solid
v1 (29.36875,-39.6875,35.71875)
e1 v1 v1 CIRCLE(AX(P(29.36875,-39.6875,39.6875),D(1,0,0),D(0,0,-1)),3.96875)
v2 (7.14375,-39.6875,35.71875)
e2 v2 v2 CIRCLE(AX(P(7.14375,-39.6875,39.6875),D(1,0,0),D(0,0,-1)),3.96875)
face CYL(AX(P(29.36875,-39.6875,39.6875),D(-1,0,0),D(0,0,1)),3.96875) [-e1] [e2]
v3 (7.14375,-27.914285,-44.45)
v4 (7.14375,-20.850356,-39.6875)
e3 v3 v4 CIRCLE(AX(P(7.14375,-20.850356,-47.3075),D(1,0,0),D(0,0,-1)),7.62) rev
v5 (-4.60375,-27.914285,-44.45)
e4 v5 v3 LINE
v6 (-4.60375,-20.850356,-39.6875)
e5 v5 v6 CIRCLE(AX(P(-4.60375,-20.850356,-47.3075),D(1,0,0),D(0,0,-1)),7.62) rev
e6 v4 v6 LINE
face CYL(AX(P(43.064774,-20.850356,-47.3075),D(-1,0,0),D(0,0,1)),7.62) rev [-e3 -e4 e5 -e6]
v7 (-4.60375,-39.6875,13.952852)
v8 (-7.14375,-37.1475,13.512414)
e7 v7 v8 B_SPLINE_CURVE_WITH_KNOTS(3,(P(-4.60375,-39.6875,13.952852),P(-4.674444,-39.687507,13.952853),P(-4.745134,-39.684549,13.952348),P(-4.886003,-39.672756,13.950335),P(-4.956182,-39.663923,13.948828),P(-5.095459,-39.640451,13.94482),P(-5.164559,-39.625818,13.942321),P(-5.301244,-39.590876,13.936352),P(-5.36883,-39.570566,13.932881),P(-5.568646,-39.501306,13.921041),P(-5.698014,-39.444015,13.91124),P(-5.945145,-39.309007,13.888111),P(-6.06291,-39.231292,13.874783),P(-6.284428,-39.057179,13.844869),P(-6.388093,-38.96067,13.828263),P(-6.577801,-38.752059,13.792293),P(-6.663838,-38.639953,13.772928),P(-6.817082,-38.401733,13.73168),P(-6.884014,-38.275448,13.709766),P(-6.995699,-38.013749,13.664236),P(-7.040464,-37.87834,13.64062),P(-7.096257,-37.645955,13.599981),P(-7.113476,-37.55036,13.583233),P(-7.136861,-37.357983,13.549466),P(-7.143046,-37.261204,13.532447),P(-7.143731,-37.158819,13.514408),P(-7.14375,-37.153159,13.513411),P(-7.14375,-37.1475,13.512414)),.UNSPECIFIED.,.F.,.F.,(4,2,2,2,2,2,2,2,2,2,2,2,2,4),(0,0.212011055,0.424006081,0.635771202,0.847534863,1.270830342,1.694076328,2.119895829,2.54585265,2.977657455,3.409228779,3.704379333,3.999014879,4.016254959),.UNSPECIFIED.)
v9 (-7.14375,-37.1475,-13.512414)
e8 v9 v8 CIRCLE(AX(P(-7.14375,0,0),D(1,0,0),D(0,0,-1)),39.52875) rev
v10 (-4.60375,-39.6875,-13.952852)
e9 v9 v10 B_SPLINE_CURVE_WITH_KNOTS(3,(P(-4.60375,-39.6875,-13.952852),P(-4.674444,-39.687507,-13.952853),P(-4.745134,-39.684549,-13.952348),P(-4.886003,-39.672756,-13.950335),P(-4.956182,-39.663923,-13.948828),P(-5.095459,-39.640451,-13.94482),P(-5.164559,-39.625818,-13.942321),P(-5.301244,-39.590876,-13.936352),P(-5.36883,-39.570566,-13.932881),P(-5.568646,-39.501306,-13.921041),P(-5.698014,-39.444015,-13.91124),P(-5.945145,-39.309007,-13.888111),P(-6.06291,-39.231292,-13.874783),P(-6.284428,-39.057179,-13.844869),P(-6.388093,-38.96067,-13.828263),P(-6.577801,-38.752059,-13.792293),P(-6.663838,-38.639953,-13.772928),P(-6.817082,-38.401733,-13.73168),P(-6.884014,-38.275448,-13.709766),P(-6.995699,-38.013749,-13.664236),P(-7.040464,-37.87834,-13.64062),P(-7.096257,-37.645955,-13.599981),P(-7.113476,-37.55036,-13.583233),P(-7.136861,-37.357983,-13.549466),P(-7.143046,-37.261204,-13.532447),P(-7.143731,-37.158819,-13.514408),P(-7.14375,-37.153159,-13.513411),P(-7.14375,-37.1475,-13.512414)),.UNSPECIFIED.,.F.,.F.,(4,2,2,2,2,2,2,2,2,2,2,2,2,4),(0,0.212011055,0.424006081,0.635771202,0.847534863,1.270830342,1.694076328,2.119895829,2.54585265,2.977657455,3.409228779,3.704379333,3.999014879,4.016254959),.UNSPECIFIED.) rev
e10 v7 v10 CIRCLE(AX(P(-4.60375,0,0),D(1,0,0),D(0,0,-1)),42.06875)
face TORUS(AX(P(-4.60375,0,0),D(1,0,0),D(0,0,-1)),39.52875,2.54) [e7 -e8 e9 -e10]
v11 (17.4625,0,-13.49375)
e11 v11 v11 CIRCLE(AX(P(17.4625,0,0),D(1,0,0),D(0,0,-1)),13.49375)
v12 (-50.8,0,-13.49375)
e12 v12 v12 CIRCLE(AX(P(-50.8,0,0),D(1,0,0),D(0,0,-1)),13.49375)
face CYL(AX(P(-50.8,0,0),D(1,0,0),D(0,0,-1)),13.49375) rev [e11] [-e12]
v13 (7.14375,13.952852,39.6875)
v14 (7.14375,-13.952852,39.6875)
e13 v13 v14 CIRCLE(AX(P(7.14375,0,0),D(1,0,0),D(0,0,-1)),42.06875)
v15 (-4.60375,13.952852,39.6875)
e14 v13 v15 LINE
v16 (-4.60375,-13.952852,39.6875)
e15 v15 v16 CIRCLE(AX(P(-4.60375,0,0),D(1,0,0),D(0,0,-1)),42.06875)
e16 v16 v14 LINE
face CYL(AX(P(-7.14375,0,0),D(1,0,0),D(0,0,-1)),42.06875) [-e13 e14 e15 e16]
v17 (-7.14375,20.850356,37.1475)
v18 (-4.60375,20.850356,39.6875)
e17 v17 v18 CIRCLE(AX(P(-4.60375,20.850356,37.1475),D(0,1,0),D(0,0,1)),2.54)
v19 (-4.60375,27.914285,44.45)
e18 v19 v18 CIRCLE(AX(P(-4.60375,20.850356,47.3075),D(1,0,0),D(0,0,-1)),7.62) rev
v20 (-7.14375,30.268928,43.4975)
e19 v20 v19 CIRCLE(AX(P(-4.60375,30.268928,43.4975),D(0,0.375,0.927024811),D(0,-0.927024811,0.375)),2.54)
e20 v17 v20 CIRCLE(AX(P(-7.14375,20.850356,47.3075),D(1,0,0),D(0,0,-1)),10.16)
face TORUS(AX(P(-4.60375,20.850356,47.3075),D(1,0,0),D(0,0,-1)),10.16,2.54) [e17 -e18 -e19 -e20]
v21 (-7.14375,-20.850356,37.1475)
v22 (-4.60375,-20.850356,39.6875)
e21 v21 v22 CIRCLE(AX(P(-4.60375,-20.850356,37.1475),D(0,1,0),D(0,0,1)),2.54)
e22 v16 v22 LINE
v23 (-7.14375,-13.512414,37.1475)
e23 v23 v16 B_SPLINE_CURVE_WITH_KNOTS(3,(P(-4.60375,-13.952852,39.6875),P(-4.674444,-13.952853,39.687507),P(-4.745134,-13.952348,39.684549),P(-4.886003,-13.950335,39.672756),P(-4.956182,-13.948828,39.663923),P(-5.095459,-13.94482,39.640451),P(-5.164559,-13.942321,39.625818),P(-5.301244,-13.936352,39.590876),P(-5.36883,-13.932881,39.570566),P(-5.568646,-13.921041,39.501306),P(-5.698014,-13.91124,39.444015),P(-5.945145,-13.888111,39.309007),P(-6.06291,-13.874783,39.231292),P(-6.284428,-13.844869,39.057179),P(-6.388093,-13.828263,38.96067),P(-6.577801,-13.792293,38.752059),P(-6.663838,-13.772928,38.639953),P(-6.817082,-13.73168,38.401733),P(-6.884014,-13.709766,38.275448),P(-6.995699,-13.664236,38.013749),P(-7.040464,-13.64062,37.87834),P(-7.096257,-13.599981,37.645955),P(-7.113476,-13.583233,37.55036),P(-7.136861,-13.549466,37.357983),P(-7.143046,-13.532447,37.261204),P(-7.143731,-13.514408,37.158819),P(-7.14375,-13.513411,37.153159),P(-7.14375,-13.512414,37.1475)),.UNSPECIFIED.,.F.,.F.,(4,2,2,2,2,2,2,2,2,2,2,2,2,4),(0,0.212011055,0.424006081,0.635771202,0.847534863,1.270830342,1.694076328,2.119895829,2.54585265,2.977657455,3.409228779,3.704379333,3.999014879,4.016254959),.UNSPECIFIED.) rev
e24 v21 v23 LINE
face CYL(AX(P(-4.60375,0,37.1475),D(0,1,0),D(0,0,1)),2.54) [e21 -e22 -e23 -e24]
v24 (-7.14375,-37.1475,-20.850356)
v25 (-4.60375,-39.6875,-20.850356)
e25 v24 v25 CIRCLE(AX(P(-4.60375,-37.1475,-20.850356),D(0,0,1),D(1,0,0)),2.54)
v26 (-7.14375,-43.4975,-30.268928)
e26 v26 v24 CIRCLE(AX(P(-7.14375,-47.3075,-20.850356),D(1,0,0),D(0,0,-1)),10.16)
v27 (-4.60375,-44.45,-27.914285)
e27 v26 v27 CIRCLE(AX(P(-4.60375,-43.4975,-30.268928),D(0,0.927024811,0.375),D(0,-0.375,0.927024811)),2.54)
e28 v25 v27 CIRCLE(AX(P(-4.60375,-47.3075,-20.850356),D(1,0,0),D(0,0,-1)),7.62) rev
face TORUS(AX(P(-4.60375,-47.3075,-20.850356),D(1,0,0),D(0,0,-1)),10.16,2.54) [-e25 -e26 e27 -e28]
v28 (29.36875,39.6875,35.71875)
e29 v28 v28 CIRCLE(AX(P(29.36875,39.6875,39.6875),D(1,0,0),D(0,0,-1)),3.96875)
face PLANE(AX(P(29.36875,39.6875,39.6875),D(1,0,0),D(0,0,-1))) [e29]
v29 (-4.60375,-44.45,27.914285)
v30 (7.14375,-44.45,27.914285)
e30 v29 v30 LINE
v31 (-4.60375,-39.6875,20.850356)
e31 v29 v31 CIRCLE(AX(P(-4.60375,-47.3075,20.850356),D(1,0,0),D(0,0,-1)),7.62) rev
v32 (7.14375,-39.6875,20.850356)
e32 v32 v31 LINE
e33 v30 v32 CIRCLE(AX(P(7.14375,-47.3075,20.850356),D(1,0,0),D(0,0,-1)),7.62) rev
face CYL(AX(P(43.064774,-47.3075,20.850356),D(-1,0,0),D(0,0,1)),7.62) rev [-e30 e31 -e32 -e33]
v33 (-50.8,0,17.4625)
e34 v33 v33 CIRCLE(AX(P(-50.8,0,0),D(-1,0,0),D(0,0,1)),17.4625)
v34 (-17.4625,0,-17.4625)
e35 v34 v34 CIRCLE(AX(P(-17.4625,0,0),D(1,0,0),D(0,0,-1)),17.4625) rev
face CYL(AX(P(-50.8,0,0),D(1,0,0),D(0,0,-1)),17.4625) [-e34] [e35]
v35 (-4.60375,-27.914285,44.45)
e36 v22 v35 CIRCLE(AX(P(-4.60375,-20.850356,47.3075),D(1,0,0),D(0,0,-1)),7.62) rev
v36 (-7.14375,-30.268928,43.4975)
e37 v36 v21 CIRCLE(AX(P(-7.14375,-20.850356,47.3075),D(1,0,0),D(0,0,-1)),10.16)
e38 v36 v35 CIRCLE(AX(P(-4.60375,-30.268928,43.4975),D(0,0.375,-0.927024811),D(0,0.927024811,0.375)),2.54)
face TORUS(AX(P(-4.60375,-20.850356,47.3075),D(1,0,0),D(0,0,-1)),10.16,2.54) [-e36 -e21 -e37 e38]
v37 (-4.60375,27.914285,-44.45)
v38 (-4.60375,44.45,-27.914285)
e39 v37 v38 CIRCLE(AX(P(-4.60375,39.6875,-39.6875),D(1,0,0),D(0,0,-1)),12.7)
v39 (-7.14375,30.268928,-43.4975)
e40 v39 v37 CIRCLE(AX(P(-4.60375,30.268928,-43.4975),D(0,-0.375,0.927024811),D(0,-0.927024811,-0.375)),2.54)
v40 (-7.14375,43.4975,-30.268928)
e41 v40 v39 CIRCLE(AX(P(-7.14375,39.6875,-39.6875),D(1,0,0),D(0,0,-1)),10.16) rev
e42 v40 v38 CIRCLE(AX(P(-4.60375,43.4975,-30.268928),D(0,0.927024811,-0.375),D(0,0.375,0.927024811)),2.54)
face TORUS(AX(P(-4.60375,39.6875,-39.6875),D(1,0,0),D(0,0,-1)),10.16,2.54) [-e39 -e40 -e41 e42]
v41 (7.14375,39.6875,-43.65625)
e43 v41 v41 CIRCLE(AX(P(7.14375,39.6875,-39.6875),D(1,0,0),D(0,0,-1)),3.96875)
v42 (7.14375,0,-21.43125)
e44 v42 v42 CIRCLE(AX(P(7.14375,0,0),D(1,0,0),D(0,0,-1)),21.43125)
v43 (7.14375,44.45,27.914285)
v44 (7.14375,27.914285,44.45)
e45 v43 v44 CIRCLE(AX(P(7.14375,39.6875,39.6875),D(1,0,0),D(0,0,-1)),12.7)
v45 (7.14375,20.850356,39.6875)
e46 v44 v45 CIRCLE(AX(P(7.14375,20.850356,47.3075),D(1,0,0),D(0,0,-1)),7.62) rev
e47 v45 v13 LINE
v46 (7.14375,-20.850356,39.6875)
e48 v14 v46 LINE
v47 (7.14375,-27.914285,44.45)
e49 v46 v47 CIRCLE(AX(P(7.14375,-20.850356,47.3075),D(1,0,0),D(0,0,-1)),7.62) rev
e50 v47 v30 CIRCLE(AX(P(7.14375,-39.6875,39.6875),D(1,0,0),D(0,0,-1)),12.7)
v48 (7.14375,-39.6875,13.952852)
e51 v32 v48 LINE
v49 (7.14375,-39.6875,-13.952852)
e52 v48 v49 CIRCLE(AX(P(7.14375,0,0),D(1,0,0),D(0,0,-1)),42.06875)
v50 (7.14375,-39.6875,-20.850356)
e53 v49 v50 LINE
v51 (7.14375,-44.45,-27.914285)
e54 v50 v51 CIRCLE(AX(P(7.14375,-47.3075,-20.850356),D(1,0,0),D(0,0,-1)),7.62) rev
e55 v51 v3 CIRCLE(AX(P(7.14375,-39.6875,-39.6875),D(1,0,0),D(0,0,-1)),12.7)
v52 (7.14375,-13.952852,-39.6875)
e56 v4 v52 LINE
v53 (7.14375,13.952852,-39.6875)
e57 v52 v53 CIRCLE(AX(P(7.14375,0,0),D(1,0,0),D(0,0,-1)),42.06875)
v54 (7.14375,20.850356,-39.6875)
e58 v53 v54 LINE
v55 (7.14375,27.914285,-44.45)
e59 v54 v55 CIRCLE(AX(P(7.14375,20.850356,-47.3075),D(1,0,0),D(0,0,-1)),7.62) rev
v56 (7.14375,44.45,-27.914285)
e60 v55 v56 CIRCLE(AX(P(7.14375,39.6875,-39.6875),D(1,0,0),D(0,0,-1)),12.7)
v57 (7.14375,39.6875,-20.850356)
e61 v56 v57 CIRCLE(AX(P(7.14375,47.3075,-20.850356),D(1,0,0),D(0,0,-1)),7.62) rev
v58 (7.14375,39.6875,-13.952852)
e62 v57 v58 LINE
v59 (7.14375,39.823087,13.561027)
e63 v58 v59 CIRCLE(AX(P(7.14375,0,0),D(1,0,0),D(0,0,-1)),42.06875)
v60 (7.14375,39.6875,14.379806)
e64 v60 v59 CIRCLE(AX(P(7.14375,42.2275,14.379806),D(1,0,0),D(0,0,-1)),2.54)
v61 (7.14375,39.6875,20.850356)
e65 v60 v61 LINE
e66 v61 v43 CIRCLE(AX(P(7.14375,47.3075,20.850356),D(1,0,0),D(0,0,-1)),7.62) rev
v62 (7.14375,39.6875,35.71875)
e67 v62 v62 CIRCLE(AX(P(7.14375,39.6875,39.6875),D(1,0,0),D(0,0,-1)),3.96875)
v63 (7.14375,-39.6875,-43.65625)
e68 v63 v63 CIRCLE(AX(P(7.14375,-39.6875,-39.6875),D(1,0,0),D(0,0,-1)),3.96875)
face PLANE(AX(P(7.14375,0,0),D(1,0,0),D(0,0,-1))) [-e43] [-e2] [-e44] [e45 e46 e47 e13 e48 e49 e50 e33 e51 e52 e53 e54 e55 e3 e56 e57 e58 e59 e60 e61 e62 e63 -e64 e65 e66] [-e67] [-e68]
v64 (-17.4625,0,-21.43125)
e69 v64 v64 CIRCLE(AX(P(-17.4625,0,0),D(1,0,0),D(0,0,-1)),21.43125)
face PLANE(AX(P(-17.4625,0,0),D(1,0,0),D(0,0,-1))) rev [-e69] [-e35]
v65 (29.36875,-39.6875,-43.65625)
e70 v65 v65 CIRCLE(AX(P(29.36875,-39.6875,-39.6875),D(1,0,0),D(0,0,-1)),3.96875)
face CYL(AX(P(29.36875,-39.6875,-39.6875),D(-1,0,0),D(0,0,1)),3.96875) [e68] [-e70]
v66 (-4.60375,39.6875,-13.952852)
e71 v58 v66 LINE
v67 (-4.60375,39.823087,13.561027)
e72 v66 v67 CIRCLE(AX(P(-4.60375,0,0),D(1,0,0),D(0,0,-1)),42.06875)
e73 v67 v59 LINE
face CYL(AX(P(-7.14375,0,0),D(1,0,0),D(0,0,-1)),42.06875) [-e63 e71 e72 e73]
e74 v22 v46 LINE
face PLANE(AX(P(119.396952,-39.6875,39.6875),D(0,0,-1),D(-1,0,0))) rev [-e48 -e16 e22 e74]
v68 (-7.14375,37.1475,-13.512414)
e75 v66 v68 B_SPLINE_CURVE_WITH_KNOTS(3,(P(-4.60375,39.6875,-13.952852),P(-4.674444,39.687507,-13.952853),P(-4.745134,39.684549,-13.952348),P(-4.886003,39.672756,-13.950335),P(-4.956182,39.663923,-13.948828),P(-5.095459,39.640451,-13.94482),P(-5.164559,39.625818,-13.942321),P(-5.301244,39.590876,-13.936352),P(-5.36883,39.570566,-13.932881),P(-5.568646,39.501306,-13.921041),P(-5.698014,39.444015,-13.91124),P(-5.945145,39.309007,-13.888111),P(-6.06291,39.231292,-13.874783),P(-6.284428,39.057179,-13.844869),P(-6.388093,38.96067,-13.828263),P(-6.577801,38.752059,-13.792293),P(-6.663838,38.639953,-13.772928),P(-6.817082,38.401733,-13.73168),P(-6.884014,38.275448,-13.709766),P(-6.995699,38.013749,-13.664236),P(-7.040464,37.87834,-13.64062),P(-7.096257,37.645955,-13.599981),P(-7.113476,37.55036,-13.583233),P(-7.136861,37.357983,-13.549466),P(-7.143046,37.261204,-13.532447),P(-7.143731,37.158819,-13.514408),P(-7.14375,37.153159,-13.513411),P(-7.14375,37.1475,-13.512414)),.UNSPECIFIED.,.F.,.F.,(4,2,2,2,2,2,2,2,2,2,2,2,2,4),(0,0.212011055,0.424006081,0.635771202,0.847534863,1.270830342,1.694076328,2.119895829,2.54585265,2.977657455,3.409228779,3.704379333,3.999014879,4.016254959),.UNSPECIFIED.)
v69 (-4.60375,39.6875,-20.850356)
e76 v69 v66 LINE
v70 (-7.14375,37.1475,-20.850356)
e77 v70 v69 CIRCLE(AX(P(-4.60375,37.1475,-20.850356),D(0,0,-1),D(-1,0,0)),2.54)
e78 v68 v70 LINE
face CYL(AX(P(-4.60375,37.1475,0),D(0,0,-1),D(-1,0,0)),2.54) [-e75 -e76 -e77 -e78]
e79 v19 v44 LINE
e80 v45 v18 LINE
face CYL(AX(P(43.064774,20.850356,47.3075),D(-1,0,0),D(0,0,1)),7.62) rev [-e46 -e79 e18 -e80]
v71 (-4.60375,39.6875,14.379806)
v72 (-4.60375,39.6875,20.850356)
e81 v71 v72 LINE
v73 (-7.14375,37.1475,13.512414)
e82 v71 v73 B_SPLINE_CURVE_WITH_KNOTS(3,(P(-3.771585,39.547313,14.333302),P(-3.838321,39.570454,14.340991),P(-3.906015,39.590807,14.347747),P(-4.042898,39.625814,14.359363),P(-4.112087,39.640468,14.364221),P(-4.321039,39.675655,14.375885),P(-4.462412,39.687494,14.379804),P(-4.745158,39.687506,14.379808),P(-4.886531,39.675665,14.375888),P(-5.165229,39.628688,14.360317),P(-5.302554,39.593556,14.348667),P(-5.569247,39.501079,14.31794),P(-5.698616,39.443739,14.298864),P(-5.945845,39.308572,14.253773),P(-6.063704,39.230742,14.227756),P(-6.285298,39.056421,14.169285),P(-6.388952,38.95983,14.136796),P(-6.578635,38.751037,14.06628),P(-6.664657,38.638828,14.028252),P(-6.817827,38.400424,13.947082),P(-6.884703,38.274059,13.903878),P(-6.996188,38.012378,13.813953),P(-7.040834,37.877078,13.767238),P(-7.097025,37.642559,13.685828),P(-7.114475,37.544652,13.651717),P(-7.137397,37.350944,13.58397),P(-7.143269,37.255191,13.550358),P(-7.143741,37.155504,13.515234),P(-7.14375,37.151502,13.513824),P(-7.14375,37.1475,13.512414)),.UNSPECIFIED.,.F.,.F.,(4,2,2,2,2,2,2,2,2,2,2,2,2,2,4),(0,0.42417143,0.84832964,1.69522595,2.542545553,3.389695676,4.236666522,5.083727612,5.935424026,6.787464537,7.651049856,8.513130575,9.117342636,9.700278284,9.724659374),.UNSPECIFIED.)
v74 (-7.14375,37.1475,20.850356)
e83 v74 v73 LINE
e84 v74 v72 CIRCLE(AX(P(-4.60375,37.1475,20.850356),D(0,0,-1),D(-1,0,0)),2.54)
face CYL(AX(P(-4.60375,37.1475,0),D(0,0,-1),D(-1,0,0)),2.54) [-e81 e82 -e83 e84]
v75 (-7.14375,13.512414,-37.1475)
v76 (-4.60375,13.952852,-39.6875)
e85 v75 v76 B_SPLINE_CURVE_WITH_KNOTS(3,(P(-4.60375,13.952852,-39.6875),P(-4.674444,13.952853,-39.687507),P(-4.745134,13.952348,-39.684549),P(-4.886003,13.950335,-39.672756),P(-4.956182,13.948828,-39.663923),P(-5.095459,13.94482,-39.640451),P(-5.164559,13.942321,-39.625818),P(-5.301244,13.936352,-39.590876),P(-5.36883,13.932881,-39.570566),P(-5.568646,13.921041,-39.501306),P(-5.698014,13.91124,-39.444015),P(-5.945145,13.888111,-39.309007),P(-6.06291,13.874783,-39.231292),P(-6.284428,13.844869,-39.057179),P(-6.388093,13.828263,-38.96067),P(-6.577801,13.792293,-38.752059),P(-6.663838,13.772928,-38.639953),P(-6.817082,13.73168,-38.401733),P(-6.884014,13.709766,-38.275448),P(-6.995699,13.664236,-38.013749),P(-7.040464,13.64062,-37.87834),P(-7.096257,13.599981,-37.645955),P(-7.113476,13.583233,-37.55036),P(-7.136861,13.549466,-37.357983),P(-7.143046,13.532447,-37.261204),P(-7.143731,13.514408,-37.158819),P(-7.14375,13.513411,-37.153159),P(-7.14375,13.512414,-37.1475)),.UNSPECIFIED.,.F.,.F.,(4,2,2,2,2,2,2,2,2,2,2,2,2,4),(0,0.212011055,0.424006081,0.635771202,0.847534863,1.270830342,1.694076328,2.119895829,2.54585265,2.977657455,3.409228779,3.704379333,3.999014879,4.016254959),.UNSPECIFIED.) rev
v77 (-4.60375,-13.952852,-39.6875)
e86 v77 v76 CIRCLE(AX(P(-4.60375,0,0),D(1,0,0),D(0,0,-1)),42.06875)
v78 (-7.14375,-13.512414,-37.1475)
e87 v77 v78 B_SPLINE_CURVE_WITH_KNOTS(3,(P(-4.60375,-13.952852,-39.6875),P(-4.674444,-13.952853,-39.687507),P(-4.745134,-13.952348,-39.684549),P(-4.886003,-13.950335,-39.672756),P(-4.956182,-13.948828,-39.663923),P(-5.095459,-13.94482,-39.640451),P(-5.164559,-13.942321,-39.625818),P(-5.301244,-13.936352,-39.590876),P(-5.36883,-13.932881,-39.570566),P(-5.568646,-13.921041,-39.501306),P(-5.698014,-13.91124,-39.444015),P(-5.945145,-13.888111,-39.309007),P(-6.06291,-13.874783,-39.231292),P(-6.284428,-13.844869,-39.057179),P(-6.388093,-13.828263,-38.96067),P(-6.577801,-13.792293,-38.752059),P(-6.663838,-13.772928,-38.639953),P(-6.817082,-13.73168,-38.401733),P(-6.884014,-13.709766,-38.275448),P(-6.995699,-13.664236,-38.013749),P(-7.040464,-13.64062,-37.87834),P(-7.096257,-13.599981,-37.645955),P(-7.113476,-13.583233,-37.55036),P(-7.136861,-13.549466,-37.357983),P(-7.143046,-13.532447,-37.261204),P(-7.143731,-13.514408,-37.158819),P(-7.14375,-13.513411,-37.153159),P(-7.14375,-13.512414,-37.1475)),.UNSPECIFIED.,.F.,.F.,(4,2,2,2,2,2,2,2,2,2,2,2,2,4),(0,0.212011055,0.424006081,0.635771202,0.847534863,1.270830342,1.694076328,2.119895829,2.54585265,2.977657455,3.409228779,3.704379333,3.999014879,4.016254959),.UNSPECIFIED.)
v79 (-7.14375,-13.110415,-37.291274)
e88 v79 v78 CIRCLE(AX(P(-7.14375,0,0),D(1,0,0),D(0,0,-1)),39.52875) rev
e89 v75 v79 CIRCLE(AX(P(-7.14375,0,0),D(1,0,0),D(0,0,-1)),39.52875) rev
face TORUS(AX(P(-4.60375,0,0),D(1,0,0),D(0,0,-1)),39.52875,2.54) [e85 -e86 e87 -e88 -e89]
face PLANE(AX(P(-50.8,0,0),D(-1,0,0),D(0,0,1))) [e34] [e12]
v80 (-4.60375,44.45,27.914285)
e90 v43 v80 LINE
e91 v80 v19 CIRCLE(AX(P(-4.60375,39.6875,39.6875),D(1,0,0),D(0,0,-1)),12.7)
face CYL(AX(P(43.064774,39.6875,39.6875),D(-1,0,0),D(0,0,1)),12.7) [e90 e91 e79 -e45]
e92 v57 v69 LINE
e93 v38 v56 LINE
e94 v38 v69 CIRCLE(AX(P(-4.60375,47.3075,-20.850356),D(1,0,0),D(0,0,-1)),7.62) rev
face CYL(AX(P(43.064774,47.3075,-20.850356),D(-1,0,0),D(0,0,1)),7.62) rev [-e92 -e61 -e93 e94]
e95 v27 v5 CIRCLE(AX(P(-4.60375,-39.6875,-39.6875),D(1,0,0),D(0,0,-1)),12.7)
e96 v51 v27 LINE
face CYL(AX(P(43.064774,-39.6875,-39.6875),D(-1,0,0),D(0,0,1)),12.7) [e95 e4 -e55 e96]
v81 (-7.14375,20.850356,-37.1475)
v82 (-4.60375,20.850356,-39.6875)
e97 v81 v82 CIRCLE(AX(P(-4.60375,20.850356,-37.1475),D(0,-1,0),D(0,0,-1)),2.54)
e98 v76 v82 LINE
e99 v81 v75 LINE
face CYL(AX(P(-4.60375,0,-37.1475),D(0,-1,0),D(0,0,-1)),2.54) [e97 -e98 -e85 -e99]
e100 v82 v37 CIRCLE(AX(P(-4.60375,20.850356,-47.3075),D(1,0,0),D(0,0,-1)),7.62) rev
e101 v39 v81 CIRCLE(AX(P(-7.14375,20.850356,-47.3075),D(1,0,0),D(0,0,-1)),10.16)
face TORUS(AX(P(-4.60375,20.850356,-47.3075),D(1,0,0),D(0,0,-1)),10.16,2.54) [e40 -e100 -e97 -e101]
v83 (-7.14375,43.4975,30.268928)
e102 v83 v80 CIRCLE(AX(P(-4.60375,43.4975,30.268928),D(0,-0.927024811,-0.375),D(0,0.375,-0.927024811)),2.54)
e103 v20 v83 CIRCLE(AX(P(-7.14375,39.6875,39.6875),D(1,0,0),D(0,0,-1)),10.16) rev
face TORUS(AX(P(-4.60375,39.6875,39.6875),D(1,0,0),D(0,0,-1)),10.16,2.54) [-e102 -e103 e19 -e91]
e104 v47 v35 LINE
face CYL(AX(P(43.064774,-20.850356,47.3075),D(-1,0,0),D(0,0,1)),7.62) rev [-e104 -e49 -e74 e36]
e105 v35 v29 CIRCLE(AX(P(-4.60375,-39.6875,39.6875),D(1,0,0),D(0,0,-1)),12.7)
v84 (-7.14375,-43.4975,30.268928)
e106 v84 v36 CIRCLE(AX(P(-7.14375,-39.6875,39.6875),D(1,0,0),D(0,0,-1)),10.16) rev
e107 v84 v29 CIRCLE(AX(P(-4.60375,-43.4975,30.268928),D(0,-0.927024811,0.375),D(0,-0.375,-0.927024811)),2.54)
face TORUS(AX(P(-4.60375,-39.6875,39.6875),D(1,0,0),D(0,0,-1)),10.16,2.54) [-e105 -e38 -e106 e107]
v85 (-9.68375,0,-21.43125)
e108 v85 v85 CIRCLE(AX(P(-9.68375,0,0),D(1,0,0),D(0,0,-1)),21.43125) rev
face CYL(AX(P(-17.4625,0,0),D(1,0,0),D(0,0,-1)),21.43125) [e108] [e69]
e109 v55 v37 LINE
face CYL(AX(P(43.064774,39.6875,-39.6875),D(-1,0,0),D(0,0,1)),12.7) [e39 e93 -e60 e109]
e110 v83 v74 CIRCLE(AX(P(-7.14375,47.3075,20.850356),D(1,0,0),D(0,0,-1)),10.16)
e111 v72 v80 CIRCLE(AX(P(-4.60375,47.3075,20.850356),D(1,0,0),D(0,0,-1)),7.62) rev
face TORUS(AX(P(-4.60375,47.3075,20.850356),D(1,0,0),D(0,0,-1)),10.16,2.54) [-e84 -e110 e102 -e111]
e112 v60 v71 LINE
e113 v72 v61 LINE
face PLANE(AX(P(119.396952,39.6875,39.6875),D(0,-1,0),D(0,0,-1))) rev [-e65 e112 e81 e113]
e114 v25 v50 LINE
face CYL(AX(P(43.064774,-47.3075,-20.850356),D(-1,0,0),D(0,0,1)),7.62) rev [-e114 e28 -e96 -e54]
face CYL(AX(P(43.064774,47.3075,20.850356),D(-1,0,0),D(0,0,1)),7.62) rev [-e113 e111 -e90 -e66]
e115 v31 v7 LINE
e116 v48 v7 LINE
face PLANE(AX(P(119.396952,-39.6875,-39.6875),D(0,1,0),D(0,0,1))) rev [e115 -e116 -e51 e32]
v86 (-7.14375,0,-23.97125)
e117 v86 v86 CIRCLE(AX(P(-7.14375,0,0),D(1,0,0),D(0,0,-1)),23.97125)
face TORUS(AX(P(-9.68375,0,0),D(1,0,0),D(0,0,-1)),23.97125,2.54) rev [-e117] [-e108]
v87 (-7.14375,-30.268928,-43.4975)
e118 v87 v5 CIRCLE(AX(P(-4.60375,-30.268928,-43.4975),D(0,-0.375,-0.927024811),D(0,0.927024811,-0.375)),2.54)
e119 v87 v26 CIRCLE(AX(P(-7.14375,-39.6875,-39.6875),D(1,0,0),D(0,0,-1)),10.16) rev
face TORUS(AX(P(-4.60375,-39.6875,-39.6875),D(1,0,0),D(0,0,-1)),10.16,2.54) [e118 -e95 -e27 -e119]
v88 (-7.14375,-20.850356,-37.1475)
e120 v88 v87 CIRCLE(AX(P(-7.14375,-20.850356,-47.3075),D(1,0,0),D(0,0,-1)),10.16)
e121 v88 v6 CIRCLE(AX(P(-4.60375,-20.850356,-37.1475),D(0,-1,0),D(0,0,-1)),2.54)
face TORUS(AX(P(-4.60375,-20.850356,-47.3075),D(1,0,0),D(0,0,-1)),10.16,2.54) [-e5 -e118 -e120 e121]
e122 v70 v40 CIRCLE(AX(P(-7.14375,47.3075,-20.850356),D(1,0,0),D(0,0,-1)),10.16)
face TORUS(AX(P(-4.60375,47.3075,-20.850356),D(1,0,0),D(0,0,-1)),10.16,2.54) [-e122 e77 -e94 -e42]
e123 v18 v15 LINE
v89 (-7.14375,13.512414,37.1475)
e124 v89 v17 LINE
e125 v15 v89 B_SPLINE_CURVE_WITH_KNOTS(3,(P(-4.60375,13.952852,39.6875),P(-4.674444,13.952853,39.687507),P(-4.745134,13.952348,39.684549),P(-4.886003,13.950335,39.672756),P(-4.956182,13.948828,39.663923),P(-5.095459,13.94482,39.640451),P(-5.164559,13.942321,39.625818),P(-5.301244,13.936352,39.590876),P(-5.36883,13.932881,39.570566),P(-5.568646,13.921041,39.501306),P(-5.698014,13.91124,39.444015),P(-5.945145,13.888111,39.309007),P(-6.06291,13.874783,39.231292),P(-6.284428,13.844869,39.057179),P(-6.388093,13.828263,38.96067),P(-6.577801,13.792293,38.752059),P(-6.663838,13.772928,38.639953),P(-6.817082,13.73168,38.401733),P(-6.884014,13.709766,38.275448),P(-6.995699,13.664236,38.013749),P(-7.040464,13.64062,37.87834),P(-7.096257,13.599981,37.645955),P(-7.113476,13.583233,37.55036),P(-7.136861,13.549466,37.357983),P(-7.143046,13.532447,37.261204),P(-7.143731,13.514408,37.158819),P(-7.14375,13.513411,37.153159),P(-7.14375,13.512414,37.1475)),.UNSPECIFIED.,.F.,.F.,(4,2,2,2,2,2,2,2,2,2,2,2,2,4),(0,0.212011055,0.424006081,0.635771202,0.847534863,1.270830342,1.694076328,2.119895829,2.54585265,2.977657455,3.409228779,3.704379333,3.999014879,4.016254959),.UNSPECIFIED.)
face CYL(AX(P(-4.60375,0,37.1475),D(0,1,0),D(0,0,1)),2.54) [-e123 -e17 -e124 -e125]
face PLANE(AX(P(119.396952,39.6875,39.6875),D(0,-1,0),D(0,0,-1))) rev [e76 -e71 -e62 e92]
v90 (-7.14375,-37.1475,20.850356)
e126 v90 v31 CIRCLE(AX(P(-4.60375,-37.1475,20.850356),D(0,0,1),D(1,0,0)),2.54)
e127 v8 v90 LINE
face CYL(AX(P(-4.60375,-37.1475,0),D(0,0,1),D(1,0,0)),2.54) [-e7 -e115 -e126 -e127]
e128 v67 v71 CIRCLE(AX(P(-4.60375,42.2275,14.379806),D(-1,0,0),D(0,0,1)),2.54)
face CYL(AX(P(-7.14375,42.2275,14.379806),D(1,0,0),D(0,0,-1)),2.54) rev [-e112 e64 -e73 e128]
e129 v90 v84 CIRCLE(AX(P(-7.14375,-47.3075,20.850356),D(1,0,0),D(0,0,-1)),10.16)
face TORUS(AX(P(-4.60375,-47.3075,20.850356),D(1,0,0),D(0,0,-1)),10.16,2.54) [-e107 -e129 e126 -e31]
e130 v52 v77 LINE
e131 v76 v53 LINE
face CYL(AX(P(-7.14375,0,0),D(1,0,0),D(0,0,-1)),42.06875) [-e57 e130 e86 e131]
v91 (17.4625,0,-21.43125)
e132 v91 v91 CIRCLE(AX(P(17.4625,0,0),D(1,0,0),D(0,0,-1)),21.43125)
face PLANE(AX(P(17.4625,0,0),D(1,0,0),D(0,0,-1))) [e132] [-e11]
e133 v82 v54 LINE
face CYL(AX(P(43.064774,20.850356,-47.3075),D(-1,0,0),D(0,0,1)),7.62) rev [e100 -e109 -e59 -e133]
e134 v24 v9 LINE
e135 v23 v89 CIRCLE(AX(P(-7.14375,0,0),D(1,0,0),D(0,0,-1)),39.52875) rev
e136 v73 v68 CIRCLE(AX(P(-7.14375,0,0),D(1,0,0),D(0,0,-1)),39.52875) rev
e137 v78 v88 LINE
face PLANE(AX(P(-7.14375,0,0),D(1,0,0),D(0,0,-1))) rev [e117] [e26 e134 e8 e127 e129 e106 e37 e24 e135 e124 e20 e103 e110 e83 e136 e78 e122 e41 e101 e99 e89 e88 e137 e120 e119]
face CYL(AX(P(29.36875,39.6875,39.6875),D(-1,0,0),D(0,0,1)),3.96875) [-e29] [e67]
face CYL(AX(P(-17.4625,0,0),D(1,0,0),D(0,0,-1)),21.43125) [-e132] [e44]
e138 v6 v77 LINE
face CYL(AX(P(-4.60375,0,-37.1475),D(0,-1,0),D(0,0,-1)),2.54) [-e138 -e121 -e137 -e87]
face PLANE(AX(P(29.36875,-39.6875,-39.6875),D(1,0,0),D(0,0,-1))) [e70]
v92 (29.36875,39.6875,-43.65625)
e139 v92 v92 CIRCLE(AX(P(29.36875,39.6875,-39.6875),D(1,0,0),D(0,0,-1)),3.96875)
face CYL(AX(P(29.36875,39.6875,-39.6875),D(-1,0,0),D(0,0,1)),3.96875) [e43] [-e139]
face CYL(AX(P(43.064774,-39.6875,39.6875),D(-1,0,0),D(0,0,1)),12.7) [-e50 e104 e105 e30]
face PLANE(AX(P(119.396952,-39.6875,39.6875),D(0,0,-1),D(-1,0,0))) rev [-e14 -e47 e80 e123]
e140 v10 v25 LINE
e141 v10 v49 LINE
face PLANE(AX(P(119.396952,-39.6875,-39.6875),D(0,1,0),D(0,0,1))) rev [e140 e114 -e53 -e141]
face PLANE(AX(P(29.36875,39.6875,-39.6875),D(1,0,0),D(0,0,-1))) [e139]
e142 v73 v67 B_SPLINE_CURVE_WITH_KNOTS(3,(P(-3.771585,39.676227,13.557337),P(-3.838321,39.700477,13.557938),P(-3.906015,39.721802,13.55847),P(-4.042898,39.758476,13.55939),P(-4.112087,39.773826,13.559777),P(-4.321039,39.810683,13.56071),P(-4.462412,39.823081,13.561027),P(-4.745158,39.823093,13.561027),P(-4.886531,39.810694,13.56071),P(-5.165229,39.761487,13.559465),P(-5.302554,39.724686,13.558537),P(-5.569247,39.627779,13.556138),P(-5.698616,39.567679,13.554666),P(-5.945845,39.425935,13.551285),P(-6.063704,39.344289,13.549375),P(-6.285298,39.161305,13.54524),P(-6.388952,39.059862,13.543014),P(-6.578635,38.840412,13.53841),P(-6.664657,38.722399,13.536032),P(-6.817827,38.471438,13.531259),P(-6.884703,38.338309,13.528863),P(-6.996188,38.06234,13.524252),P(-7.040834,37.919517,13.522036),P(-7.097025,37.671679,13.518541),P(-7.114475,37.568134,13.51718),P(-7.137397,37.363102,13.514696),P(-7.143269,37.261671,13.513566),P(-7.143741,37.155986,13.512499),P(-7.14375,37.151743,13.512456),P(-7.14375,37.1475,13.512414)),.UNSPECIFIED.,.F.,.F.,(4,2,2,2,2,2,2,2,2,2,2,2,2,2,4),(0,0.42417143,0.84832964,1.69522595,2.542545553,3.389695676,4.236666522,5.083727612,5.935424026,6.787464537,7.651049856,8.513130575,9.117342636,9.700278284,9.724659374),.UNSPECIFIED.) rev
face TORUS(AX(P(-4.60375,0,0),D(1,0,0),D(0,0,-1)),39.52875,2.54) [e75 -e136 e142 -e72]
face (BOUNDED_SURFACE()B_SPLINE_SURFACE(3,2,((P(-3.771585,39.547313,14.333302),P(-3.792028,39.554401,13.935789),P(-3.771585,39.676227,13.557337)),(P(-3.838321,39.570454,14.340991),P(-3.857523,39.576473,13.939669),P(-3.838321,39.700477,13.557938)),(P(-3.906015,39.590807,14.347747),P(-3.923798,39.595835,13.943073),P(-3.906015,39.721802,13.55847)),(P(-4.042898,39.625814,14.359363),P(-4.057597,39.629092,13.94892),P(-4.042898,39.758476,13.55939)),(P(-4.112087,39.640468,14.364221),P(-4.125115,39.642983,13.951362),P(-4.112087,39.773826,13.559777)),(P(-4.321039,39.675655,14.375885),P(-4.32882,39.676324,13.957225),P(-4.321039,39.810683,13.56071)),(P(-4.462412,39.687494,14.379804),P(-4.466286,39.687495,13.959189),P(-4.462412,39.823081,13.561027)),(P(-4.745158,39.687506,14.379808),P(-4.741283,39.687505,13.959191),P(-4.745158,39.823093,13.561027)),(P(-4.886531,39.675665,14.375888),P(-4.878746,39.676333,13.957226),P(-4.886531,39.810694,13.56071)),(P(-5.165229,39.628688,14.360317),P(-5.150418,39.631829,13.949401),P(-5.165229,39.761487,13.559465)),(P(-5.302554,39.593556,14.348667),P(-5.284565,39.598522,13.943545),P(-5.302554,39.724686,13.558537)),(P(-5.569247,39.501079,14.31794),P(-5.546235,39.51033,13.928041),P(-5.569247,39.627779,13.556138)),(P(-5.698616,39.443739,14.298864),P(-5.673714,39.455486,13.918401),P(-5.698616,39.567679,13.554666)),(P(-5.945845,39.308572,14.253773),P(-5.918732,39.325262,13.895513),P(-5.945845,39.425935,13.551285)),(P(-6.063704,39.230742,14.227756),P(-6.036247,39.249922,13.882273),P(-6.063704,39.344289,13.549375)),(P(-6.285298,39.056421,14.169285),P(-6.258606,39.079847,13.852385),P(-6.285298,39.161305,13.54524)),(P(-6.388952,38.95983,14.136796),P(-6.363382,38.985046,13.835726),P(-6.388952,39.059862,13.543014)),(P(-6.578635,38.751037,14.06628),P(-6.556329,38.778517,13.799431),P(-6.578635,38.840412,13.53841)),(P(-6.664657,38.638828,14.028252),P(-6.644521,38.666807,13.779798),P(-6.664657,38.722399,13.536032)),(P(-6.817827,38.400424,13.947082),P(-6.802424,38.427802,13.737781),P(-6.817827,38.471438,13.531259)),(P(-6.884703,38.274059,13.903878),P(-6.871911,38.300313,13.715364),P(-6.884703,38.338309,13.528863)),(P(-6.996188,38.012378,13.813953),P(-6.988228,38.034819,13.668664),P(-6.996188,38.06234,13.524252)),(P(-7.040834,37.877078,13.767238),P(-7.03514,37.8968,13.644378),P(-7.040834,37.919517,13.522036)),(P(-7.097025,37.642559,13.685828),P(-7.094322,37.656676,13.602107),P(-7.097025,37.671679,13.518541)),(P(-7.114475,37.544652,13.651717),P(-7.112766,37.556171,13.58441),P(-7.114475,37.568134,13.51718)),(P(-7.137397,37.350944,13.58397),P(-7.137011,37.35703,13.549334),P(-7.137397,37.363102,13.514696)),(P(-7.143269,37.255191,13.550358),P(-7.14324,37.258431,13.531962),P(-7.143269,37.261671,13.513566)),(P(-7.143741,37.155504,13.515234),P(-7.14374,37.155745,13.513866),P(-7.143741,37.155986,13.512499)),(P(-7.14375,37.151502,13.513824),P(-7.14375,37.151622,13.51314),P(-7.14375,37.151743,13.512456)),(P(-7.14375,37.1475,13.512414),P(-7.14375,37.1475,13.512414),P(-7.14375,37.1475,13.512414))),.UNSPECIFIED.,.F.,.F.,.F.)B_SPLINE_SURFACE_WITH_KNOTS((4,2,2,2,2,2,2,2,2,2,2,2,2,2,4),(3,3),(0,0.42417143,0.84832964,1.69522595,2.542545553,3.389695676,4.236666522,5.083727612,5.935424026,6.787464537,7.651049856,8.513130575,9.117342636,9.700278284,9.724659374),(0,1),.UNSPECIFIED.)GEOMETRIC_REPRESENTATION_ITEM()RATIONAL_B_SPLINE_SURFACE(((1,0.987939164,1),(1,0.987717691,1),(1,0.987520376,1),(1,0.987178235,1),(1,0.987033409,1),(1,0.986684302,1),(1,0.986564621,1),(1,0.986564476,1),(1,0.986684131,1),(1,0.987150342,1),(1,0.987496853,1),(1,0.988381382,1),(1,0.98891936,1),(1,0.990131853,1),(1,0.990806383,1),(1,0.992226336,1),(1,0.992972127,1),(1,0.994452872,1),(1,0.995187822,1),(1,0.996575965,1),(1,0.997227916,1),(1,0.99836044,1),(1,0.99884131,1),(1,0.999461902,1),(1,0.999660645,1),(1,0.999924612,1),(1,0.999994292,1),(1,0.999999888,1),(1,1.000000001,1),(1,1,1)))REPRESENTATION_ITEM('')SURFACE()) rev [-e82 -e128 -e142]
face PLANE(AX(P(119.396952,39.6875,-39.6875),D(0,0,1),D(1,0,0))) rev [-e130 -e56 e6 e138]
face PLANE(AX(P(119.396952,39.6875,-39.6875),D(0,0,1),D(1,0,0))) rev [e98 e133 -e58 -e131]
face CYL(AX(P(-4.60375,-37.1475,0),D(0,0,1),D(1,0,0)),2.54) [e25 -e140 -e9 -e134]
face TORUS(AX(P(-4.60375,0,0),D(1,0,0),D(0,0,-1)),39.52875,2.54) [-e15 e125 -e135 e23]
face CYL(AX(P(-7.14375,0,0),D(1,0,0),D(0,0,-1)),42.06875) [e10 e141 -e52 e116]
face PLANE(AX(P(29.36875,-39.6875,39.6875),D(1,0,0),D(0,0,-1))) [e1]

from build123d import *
from build123d.topology import SkipClean

# Parameters (mm, degrees)
EXTRUDE1_DEPTH             = 7.14375
EXTRUDE1_DEPTH_BACK        = 7.14375
SKETCH1_R                  = 42.06875
EXTRUDE2_DEPTH             = 17.4625
EXTRUDE2_DEPTH_BACK        = 17.4625
SKETCH3_R                  = 21.43125
SKETCH4_R                  = 17.4625
EXTRUDE3_DEPTH             = 33.3375
EXTRUDE4_REACH             = 80.232
SKETCH5_R                  = 12.7
EXTRUDE4_DIRECTION_2_REACH = 80.232
EXTRUDE5_START             = -7.14375
SKETCH6_W                  = 79.375
SKETCH6_H                  = 79.375
EXTRUDE5_DEPTH             = 14.2875
FILLET1_R                  = 7.62
SKETCH7_R                  = 13.49375
EXTRUDE6_DEPTH             = 101.740603625
SKETCH8_R                  = 3.96875
EXTRUDE7_DEPTH             = 22.225
FILLET2_R                  = 2.54
FILLET3_R                  = 2.54
FILLET4_R                  = 2.54
FILLET5_R                  = 2.54
FILLET6_R                  = 2.54
FILLET7_R                  = 2.54
FILLET8_R                  = 2.54
FILLET9_R                  = 2.54
FILLET10_R                 = 2.54
FILLET11_R                 = 2.54


with BuildPart() as part:
    # Sketch1 → Extrude1 (new, two sides: drawn at the far end of the back side and taken through both)
    with BuildSketch(Plane(origin=(0, 0, 0), x_dir=(0, 0, -1), z_dir=(1, 0, 0)).offset(-EXTRUDE1_DEPTH_BACK)):
        Circle(SKETCH1_R)
    extrude(amount=EXTRUDE1_DEPTH + EXTRUDE1_DEPTH_BACK)

    # Sketch3 → Extrude2 (add, two sides: drawn at the far end of the back side and taken through both)
    with BuildSketch(Plane(origin=(0, 0, 0), x_dir=(0, 0, -1), z_dir=(1, 0, 0)).offset(-EXTRUDE2_DEPTH_BACK)):
        Circle(SKETCH3_R)
    extrude(amount=EXTRUDE2_DEPTH + EXTRUDE2_DEPTH_BACK)

    # Sketch4 → Extrude3 (add)
    with BuildSketch(Plane.ZY.offset(17.4625)):
        with Locations(Location((0, 0, 0), (0, 0, 180))):
            Circle(SKETCH4_R)
    extrude(amount=EXTRUDE3_DEPTH)


with BuildPart() as body_2:

    # Extrude4: up to this face of the body (flat: up to its plane)
    extrude4_end = Plane(part.part.faces().sort_by_distance((7.14375, 0, 40.878866064))[0])
    # Sketch5 → Extrude4 (new, up to the picked face)
    with BuildSketch(Plane(origin=(0, 0, 0), x_dir=(0, 0, -1), z_dir=(1, 0, 0)), mode=Mode.PRIVATE) as extrude4_sk1:
        with Locations((-39.6875, 39.6875)):
            Circle(SKETCH5_R)
    extrude4_tool1 = split(extrude(extrude4_sk1.sketch, amount=EXTRUDE4_REACH, mode=Mode.PRIVATE), bisect_by=extrude4_end, keep=Keep.BOTH, mode=Mode.PRIVATE)
    # Sketch5 → Extrude4 (new, up to the picked face)
    with BuildSketch(Plane(origin=(0, 0, 0), x_dir=(0, 0, -1), z_dir=(1, 0, 0)), mode=Mode.PRIVATE) as extrude4_sk2:
        with Locations((-39.6875, -39.6875)):
            Circle(SKETCH5_R)
    extrude4_tool2 = split(extrude(extrude4_sk2.sketch, amount=EXTRUDE4_REACH, mode=Mode.PRIVATE), bisect_by=extrude4_end, keep=Keep.BOTH, mode=Mode.PRIVATE)
    # Sketch5 → Extrude4 (new, up to the picked face)
    with BuildSketch(Plane(origin=(0, 0, 0), x_dir=(0, 0, -1), z_dir=(1, 0, 0)), mode=Mode.PRIVATE) as extrude4_sk3:
        with Locations((39.6875, -39.6875)):
            Circle(SKETCH5_R)
    extrude4_tool3 = split(extrude(extrude4_sk3.sketch, amount=EXTRUDE4_REACH, mode=Mode.PRIVATE), bisect_by=extrude4_end, keep=Keep.BOTH, mode=Mode.PRIVATE)
    # Sketch5 → Extrude4 (new, up to the picked face)
    with BuildSketch(Plane(origin=(0, 0, 0), x_dir=(0, 0, -1), z_dir=(1, 0, 0)), mode=Mode.PRIVATE) as extrude4_sk4:
        with Locations((39.6875, 39.6875)):
            Circle(SKETCH5_R)
    extrude4_tool4 = split(extrude(extrude4_sk4.sketch, amount=EXTRUDE4_REACH, mode=Mode.PRIVATE), bisect_by=extrude4_end, keep=Keep.BOTH, mode=Mode.PRIVATE)
    add(extrude4_tool1.solids().sort_by(Axis((0, 39.6875, 39.6875), (1, 0, 0)))[0])
    add(extrude4_tool2.solids().sort_by(Axis((0, -39.6875, 39.6875), (1, 0, 0)))[0])
    add(extrude4_tool3.solids().sort_by(Axis((0, -39.6875, -39.6875), (1, 0, 0)))[0])
    add(extrude4_tool4.solids().sort_by(Axis((0, 39.6875, -39.6875), (1, 0, 0)))[0])


    # Extrude4 direction 2: up to this face of the body (flat: up to its plane)
    extrude4_direction_2_end = Plane(part.part.faces().sort_by_distance((-7.14375, 0, 40.878866064))[0])
    # Sketch5 → Extrude4 direction 2 (add, up to the picked face)
    with BuildSketch(Plane(origin=(0, 0, 0), x_dir=(0, 0, -1), z_dir=(1, 0, 0)), mode=Mode.PRIVATE) as extrude4_direction_2_sk1:
        with Locations((-39.6875, 39.6875)):
            Circle(SKETCH5_R)
    extrude4_direction_2_tool1 = split(extrude(extrude4_direction_2_sk1.sketch, amount=-EXTRUDE4_DIRECTION_2_REACH, mode=Mode.PRIVATE), bisect_by=extrude4_direction_2_end, keep=Keep.BOTH, mode=Mode.PRIVATE)
    # Sketch5 → Extrude4 direction 2 (add, up to the picked face)
    with BuildSketch(Plane(origin=(0, 0, 0), x_dir=(0, 0, -1), z_dir=(1, 0, 0)), mode=Mode.PRIVATE) as extrude4_direction_2_sk2:
        with Locations((-39.6875, -39.6875)):
            Circle(SKETCH5_R)
    extrude4_direction_2_tool2 = split(extrude(extrude4_direction_2_sk2.sketch, amount=-EXTRUDE4_DIRECTION_2_REACH, mode=Mode.PRIVATE), bisect_by=extrude4_direction_2_end, keep=Keep.BOTH, mode=Mode.PRIVATE)
    # Sketch5 → Extrude4 direction 2 (add, up to the picked face)
    with BuildSketch(Plane(origin=(0, 0, 0), x_dir=(0, 0, -1), z_dir=(1, 0, 0)), mode=Mode.PRIVATE) as extrude4_direction_2_sk3:
        with Locations((39.6875, -39.6875)):
            Circle(SKETCH5_R)
    extrude4_direction_2_tool3 = split(extrude(extrude4_direction_2_sk3.sketch, amount=-EXTRUDE4_DIRECTION_2_REACH, mode=Mode.PRIVATE), bisect_by=extrude4_direction_2_end, keep=Keep.BOTH, mode=Mode.PRIVATE)
    # Sketch5 → Extrude4 direction 2 (add, up to the picked face)
    with BuildSketch(Plane(origin=(0, 0, 0), x_dir=(0, 0, -1), z_dir=(1, 0, 0)), mode=Mode.PRIVATE) as extrude4_direction_2_sk4:
        with Locations((39.6875, 39.6875)):
            Circle(SKETCH5_R)
    extrude4_direction_2_tool4 = split(extrude(extrude4_direction_2_sk4.sketch, amount=-EXTRUDE4_DIRECTION_2_REACH, mode=Mode.PRIVATE), bisect_by=extrude4_direction_2_end, keep=Keep.BOTH, mode=Mode.PRIVATE)
    add(extrude4_direction_2_tool1.solids().sort_by(Axis((0, 39.6875, 39.6875), (-1, 0, 0)))[0])
    add(extrude4_direction_2_tool2.solids().sort_by(Axis((0, -39.6875, 39.6875), (-1, 0, 0)))[0])
    add(extrude4_direction_2_tool3.solids().sort_by(Axis((0, -39.6875, -39.6875), (-1, 0, 0)))[0])
    add(extrude4_direction_2_tool4.solids().sort_by(Axis((0, 39.6875, -39.6875), (-1, 0, 0)))[0])


with BuildPart() as part_1:
    with SkipClean():  # the faces are left unmerged after this step: merging them gives an invalid solid
        add(part.part)

        add(body_2.part)  # Extrude5 merges body 2
        # Sketch6 → Extrude5 (add)
        with BuildSketch(Plane(origin=(0, 0, 0), x_dir=(0, 0, -1), z_dir=(1, 0, 0)).offset(EXTRUDE5_START)):
            Rectangle(SKETCH6_W, SKETCH6_H)
        extrude(amount=EXTRUDE5_DEPTH)
    add(part_1.part.scale(1), mode=Mode.REPLACE)  # the faces are merged on a copy

    # Fillet1
    fillet1_edges = [part_1.edges().sort_by_distance(p)[0] for p in [
        (0, 26.9875, 39.6875),
        (0, 39.6875, 26.9875),
        (0, -26.9875, 39.6875),
        (0, -39.6875, 26.9875),
        (0, -39.6875, -26.9875),
        (0, -26.9875, -39.6875),
        (0, 26.9875, -39.6875),
        (0, 39.6875, -26.9875),
    ]]
    fillet(fillet1_edges, radius=FILLET1_R)

    # Sketch7 → Extrude6 (cut, through all)
    with BuildSketch(Plane(origin=(17.4625, 0, 0), x_dir=(0, 0, -1), z_dir=(1, 0, 0))):
        Circle(SKETCH7_R)
    extrude(amount=-EXTRUDE6_DEPTH, mode=Mode.SUBTRACT)

    # Sketch8 → Extrude7 (add)
    with BuildSketch(Plane(origin=(7.14375, 0, 0), x_dir=(0, 0, -1), z_dir=(1, 0, 0))):
        with Locations((39.6875, 39.6875)):
            Circle(SKETCH8_R)
        with Locations((-39.6875, 39.6875)):
            Circle(SKETCH8_R)
        with Locations((-39.6875, -39.6875)):
            Circle(SKETCH8_R)
        with Locations((39.6875, -39.6875)):
            Circle(SKETCH8_R)
    extrude(amount=EXTRUDE7_DEPTH)

    # Fillet2
    fillet2_edges = [part_1.edges().sort_by_distance(p)[0] for p in [
        (-7.14375, 48.667756121, 48.667756121),
        (-7.14375, 39.6875, 17.401603767),
        (-7.14375, 40.989329774, 25.11006534),
        (-7.14375, 25.11006534, 40.989329774),
        (-7.14375, 17.401603767, 39.6875),
    ]]
    fillet(fillet2_edges, radius=FILLET2_R)

    # Fillet3
    fillet3_edges = [part_1.edges().sort_by_distance(p)[0] for p in [
        (-7.14375, -48.667756121, 48.667756121),
        (-7.14375, -17.401603767, 39.6875),
        (-7.14375, -40.989329774, 25.11006534),
        (-7.14375, -25.11006534, 40.989329774),
        (-7.14375, -39.6875, 17.401603767),
    ]]
    fillet(fillet3_edges, radius=FILLET3_R)

    # Fillet4
    fillet4_edges = [part_1.edges().sort_by_distance(p)[0] for p in [
        (-7.14375, 48.667756121, -48.667756121),
        (-7.14375, 17.401603767, -39.6875),
        (-7.14375, 25.11006534, -40.989329774),
        (-7.14375, 40.989329774, -25.11006534),
        (-7.14375, 39.6875, -17.401603767),
    ]]
    fillet(fillet4_edges, radius=FILLET4_R)

    # Fillet5
    fillet5_edges = [part_1.edges().sort_by_distance(p)[0] for p in [
        (-7.14375, -39.6875, -17.401603767),
        (-7.14375, -25.11006534, -40.989329774),
        (-7.14375, -40.989329774, -25.11006534),
        (-7.14375, -17.401603767, -39.6875),
        (-7.14375, -48.667756121, -48.667756121),
    ]]
    fillet(fillet5_edges, radius=FILLET5_R)

    # Fillet6
    fillet6_edges = [part_1.edges().sort_by_distance(p)[0] for p in [
        (-7.14375, 0, -42.06875),
    ]]
    fillet(fillet6_edges, radius=FILLET6_R)

    # Fillet7
    fillet7_edges = [part_1.edges().sort_by_distance(p)[0] for p in [
        (-7.14375, -42.06875, 0),
    ]]
    fillet(fillet7_edges, radius=FILLET7_R)

    # Fillet8
    fillet8_edges = [part_1.edges().sort_by_distance(p)[0] for p in [
        (-7.14375, 0, 42.06875),
    ]]
    fillet(fillet8_edges, radius=FILLET8_R)

    # Fillet9
    fillet9_edges = [part_1.edges().sort_by_distance(p)[0] for p in [
        (-7.14375, 42.06875, 0),
    ]]
    fillet(fillet9_edges, radius=FILLET9_R)

    # Fillet10
    fillet10_edges = [part_1.edges().sort_by_distance(p)[0] for p in [
        (-7.14375, 0, 21.43125),
    ]]
    fillet(fillet10_edges, radius=FILLET10_R)

    # Fillet11
    fillet11_edges = [part_1.edges().sort_by_distance(p)[0] for p in [
        (1.27, 39.6875, 13.952851691),
        (-6.40656867, 38.936758181, 13.824133333),
    ]]
    fillet(fillet11_edges, radius=FILLET11_R)


solid = part_1.part
